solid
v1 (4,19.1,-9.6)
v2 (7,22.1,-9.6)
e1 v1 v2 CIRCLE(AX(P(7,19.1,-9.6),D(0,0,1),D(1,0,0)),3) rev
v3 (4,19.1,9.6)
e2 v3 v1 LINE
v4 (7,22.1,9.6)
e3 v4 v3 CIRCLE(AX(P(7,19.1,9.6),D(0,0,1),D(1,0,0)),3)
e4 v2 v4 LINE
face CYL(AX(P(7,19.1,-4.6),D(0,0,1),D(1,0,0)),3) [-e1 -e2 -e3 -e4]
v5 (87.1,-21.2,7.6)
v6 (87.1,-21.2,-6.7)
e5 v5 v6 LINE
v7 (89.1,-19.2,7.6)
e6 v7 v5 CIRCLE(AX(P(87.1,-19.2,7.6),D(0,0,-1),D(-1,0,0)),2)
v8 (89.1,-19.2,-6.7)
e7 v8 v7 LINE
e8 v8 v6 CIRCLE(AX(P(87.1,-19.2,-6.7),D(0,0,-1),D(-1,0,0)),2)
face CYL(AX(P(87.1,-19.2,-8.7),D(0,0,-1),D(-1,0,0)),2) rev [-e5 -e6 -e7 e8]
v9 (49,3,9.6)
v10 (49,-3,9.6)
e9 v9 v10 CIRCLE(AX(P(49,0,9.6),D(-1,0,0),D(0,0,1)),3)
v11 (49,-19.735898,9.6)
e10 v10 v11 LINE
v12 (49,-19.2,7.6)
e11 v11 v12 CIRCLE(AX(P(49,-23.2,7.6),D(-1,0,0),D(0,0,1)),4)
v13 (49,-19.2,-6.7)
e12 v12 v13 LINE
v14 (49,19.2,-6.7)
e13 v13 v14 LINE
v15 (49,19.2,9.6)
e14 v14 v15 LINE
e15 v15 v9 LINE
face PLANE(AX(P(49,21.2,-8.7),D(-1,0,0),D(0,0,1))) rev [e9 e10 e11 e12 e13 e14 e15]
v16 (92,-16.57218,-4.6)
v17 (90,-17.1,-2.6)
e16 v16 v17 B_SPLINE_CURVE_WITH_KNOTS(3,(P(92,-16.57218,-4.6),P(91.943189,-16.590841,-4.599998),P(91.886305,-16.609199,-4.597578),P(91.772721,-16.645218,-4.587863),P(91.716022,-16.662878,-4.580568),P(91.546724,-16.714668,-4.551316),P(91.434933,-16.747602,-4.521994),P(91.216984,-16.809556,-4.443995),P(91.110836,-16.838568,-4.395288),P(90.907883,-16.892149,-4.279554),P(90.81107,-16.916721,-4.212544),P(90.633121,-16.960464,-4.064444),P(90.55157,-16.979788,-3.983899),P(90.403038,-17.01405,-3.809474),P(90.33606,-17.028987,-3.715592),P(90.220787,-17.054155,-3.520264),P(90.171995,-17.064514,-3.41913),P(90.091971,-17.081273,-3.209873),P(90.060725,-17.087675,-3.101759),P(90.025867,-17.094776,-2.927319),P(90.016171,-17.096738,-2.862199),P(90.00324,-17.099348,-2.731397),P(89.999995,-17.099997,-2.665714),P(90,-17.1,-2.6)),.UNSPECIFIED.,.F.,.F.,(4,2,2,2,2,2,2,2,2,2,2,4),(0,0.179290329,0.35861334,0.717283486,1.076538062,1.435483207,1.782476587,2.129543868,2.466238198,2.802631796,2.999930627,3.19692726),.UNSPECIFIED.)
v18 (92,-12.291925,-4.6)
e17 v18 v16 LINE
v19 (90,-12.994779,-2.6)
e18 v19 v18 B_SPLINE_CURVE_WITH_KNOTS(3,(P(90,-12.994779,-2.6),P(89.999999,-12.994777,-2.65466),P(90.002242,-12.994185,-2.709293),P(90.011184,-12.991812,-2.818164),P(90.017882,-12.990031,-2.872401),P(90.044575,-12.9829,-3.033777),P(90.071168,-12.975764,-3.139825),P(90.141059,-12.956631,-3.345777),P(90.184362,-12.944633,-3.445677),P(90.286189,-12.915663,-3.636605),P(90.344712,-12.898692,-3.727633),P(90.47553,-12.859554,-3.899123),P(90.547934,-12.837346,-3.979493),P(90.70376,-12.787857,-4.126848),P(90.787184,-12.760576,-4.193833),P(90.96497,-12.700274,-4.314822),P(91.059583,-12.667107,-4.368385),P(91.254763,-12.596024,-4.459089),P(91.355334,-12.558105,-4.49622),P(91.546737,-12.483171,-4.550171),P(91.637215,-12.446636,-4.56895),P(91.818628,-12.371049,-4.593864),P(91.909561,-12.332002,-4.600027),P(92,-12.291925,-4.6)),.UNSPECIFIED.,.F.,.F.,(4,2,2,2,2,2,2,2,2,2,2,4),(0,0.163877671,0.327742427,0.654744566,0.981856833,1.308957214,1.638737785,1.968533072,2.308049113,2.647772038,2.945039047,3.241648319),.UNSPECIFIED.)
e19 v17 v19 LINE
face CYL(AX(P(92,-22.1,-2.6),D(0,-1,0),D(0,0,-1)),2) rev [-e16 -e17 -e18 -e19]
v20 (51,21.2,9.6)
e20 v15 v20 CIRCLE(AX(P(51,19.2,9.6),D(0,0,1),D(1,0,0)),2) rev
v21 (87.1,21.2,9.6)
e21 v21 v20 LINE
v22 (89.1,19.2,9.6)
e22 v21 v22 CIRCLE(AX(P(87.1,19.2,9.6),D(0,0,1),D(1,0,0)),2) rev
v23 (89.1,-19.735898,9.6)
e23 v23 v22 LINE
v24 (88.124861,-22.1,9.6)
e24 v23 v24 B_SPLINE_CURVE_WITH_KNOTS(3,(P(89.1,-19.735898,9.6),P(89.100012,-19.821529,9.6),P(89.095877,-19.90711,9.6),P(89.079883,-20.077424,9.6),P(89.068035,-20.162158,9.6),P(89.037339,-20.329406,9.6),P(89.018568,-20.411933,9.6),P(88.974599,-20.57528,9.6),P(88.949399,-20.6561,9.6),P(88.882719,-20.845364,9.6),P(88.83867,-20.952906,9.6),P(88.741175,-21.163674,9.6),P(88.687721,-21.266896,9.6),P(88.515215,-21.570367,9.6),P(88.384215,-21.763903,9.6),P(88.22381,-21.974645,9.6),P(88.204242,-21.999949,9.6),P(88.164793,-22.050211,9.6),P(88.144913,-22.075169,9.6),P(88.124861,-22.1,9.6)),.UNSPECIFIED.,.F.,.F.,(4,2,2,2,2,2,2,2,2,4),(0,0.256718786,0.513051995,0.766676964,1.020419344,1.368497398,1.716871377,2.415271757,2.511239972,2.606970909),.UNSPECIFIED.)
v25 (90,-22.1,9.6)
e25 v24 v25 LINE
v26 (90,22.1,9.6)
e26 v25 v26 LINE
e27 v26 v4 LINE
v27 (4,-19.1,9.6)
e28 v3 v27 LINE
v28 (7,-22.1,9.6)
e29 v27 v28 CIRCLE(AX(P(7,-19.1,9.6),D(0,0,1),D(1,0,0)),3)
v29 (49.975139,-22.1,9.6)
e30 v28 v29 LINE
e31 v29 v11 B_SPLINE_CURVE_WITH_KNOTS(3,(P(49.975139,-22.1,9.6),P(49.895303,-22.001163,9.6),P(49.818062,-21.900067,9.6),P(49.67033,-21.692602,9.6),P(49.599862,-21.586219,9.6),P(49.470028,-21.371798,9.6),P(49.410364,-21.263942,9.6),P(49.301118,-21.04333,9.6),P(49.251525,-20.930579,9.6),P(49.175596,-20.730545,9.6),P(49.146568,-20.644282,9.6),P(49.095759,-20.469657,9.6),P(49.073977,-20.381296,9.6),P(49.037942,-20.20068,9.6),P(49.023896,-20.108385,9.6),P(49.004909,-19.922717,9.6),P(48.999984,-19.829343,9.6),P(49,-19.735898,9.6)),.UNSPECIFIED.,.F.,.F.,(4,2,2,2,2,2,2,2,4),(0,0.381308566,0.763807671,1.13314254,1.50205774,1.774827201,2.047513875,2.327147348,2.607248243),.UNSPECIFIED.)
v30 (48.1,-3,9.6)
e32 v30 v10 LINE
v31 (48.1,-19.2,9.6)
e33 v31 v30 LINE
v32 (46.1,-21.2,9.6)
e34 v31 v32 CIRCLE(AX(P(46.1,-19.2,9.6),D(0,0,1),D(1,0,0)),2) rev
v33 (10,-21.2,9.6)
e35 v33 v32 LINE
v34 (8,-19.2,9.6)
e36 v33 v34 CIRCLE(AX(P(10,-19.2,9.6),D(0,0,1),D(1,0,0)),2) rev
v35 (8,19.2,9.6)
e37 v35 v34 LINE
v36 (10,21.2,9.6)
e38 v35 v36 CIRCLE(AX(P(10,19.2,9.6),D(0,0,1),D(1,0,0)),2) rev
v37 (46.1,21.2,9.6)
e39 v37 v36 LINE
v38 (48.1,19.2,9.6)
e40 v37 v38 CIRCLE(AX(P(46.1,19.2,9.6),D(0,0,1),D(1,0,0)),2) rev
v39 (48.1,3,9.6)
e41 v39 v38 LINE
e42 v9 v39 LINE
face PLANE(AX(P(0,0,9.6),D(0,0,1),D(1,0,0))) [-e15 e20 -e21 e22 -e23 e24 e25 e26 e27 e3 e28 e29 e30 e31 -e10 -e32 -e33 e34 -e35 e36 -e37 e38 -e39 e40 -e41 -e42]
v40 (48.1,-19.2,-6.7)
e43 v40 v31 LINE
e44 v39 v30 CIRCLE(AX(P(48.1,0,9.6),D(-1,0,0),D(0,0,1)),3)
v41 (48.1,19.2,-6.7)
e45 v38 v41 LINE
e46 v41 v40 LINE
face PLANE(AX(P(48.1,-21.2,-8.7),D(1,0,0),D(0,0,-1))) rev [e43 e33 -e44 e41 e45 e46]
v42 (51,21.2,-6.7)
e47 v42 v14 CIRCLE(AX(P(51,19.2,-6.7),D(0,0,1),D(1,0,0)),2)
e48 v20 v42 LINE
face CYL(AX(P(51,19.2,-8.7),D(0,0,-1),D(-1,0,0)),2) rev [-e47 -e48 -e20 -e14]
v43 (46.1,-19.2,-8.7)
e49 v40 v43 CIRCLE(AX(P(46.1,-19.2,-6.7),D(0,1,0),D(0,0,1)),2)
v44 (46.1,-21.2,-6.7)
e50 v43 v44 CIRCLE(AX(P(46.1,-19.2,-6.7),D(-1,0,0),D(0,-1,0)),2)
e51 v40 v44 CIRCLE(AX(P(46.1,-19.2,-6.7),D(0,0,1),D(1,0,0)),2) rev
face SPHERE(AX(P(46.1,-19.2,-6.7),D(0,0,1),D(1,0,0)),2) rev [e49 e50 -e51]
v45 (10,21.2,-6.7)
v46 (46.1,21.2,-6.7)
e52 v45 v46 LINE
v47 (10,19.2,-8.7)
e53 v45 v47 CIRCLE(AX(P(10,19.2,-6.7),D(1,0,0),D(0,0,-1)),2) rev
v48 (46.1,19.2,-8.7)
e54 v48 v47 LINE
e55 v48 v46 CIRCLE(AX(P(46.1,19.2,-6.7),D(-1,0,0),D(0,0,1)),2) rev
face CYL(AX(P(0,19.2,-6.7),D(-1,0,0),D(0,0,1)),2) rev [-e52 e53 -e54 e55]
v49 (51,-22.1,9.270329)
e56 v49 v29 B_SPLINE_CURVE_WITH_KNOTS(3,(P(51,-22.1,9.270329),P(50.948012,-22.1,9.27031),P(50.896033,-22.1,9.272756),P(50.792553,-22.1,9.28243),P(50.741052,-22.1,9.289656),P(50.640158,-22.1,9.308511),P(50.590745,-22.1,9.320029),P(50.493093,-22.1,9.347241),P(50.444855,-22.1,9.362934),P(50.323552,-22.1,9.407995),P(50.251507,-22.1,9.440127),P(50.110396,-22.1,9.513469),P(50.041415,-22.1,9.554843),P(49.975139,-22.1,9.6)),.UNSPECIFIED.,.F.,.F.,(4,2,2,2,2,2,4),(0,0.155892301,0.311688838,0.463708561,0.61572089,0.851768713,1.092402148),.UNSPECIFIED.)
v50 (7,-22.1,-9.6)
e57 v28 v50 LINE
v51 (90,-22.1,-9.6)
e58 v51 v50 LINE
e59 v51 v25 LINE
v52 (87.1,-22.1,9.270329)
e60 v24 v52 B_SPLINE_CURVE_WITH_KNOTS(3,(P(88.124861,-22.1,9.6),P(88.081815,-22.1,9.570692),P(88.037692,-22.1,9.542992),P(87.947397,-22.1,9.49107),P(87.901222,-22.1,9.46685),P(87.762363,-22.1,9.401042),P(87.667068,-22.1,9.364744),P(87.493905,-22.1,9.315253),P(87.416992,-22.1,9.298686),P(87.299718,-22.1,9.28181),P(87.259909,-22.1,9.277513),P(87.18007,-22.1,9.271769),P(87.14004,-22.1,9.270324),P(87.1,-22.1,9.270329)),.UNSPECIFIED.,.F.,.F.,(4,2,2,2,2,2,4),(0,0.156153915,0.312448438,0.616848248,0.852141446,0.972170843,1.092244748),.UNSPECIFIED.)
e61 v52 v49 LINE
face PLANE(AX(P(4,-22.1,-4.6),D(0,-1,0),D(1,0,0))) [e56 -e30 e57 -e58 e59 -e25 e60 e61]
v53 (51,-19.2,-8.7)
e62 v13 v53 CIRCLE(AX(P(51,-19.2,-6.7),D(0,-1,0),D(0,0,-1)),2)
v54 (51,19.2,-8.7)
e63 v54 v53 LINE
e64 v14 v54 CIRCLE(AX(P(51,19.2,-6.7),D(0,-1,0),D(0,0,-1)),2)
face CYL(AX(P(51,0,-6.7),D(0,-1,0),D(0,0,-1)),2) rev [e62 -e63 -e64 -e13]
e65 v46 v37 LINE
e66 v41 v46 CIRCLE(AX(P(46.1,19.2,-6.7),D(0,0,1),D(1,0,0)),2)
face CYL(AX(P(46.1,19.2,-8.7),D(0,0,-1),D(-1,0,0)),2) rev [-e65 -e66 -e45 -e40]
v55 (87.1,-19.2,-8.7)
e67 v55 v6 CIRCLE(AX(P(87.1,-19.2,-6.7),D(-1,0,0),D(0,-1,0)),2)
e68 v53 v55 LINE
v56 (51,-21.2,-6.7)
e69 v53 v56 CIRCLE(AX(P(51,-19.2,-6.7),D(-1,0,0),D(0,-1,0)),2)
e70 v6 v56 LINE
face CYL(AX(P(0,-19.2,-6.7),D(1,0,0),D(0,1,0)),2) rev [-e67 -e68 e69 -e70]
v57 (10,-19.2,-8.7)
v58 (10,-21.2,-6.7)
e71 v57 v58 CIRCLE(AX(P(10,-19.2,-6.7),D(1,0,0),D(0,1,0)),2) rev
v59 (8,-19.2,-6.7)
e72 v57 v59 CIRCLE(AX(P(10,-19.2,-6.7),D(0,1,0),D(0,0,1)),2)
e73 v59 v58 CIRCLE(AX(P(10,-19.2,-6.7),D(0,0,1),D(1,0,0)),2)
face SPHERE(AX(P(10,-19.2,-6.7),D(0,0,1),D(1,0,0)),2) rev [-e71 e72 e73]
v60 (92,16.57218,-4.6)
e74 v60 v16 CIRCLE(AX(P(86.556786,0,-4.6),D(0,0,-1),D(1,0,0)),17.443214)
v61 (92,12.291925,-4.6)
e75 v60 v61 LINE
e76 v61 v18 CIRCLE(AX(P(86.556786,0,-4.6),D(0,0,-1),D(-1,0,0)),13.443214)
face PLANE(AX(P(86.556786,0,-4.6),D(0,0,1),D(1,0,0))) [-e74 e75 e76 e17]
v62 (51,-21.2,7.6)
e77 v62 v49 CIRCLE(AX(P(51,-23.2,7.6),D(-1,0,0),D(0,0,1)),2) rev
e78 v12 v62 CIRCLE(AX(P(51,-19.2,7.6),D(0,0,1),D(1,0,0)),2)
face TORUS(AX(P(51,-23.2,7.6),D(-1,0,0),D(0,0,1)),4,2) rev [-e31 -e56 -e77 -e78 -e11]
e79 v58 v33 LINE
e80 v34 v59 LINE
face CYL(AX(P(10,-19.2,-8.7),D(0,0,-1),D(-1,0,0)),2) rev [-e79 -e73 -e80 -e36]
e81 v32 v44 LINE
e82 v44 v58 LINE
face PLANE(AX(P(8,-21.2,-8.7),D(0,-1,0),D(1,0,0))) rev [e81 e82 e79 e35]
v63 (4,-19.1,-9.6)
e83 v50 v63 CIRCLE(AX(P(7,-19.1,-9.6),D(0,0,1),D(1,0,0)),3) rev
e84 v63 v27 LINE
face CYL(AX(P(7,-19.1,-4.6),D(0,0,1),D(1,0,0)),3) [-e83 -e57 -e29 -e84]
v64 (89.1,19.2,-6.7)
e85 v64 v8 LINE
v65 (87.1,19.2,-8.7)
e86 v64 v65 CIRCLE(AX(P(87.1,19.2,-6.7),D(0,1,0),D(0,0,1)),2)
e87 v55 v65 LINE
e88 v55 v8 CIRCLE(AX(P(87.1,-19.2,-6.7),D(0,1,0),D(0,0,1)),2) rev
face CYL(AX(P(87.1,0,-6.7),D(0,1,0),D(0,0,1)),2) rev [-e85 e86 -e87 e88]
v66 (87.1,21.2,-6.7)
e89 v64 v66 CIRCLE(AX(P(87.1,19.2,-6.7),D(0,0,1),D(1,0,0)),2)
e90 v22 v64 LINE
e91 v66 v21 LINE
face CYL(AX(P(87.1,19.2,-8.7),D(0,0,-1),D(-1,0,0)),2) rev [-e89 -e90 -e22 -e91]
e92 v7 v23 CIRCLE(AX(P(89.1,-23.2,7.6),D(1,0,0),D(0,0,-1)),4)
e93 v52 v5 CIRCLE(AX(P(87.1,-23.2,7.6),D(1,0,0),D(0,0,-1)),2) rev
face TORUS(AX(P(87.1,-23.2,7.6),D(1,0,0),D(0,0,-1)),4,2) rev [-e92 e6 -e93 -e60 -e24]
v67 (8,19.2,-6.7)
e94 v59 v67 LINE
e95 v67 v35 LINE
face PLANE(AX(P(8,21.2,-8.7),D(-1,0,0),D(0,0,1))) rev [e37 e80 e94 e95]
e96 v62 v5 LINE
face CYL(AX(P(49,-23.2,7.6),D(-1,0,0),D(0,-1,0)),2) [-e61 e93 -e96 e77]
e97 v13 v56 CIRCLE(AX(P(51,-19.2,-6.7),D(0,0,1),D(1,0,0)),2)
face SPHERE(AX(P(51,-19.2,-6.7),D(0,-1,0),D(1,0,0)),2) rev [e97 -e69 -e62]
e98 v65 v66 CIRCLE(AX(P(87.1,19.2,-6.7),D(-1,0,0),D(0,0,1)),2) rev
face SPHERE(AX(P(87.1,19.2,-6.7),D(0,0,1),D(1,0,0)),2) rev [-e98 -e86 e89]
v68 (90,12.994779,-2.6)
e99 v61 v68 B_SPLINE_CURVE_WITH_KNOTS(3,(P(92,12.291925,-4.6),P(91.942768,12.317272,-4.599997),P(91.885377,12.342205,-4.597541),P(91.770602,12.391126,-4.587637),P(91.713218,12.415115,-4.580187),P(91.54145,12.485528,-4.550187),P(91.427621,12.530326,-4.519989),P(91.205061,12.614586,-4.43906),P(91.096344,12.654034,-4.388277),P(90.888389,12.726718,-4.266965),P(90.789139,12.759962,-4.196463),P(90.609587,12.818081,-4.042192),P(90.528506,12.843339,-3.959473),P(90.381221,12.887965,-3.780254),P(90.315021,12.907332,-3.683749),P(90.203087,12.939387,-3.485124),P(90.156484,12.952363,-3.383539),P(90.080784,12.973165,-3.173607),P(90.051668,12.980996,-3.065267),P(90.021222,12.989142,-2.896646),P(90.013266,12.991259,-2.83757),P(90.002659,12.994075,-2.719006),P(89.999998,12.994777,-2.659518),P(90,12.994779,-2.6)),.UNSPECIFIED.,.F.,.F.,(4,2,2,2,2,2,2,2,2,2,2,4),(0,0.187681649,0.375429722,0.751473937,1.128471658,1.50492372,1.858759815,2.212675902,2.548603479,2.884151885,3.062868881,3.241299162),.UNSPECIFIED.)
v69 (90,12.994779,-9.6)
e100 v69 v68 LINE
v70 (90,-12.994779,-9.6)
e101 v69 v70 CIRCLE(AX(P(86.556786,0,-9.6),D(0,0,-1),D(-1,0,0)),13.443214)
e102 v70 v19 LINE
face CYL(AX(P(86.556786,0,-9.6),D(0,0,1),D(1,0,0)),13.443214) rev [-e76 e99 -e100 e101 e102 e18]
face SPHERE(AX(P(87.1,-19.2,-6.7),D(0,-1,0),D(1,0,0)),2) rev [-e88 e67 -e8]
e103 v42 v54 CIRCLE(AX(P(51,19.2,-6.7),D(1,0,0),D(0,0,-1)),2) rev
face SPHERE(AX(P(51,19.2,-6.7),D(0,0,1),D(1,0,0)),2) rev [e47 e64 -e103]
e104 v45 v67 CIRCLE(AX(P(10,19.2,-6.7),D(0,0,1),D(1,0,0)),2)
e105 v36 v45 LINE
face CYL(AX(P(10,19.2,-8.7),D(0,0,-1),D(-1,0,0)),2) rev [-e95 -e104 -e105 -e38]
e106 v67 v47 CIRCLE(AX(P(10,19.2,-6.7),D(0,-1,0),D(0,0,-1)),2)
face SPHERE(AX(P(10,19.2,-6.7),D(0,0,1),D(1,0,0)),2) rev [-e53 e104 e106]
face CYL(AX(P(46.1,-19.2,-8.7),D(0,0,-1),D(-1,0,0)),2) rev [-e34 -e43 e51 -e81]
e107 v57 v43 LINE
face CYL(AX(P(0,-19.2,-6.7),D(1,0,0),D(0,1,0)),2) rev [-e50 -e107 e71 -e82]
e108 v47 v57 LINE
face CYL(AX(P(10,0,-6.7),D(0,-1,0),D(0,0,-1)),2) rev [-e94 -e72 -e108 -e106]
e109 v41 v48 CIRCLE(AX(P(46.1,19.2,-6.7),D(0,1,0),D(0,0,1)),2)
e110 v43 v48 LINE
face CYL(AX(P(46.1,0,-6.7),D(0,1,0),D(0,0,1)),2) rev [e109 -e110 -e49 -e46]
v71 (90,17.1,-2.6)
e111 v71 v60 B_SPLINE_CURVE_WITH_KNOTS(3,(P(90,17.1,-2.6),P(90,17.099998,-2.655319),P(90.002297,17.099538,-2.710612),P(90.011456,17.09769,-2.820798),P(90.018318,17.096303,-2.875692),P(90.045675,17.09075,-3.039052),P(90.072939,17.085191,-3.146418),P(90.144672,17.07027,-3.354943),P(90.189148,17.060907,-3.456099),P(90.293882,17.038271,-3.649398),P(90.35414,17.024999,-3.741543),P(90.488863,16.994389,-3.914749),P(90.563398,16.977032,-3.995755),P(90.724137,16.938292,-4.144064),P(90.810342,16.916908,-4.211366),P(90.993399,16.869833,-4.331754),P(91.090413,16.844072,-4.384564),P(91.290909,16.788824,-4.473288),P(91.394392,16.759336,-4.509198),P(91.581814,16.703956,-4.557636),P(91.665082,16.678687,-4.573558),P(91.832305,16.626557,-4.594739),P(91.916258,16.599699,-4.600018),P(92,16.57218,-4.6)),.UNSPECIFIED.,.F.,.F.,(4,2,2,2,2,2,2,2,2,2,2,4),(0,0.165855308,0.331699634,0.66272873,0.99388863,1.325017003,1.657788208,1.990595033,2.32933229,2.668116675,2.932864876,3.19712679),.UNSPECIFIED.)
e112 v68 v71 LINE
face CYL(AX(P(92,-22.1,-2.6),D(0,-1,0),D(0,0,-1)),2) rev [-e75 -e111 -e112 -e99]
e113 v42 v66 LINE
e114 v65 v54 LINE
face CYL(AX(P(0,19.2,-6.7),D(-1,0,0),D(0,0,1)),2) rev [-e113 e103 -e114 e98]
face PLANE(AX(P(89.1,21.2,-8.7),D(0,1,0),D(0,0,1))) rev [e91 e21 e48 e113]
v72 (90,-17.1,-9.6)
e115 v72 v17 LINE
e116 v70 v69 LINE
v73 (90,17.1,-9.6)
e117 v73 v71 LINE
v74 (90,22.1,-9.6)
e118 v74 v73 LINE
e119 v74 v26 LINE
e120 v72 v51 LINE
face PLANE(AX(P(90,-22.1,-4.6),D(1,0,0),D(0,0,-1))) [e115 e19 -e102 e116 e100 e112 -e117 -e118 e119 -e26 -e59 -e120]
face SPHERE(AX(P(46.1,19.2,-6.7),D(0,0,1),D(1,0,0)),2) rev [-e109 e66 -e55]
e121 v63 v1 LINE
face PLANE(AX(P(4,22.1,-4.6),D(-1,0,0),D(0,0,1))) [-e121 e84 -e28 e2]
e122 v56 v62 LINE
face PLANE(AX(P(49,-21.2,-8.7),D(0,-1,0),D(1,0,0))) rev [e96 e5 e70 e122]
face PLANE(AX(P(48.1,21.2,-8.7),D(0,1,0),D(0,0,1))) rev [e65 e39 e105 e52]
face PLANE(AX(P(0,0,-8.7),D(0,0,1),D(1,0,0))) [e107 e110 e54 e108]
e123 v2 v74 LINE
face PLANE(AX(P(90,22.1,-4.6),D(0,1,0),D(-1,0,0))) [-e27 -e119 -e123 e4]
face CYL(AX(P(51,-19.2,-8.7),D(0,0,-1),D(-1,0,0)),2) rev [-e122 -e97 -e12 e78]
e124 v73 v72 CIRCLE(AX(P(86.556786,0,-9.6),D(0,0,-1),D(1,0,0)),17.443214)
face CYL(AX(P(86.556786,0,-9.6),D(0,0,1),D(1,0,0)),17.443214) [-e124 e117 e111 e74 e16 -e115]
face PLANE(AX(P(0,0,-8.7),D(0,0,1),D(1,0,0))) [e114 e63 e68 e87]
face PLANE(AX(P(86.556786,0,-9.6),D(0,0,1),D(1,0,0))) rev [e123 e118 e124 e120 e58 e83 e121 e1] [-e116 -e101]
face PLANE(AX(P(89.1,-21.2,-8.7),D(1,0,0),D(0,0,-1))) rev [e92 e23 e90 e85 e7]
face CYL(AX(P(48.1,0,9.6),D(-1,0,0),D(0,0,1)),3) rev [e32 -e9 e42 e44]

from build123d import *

# Parameters (mm, degrees)
SKETCH_1_W                  = 86
SKETCH_1_H                  = 44.2
EXTRUDE_1_DEPTH             = 14.2
EXTRUDE_2_DEPTH             = 5
SKETCH_3_W                  = 40.1
SKETCH_3_H                  = 42.4
CUT_EXTRUDE_1_DEPTH         = 18.3
SKETCH_4_W                  = 40.1
SKETCH_4_H                  = 42.4
CUT_EXTRUDE_2_DEPTH         = 18.3
HOLE_WIZARD_8_3_8_3_1_D     = 8.3
HOLE_WIZARD_8_3_8_3_1_DEPTH = 3.2
HOLE_WIZARD_6_0_6_1_D       = 6
HOLE_WIZARD_6_0_6_1_DEPTH   = 0.9
FILLET_1_R                  = 3
EXTRUDE_START               = -3.5
SKETCH_9_R                  = 4.15
EXTRUDE_3_DEPTH             = 3.5
FILLET_2_R                  = 2
FILLET_3_R                  = 2
FILLET_4_R                  = 2
FILLET_5_R                  = 2


with BuildPart() as part:
    # Эскиз1 → Бобышка-Вытянуть1 (new body)
    with BuildSketch(Plane.XY.offset(9.6)):
        with Locations((47, 0)):
            Rectangle(SKETCH_1_W, SKETCH_1_H)
    extrude(amount=-EXTRUDE_1_DEPTH)

    # Эскиз2 → Бобышка-Вытянуть2 (add)
    with BuildSketch(Plane(origin=(0, 0, -4.6), x_dir=(-1, 0, 0), z_dir=(0, 0, -1))):
        with BuildLine():
            Line((-90, -22.1), (-90, -17.1))
            ThreePointArc((-90, -17.1), (-104, 0), (-90, 17.1))
            Line((-90, 17.1), (-90, 22.1))
            Line((-90, 22.1), (-4, 22.1))
            Line((-4, 22.1), (-4, -22.1))
            Line((-4, -22.1), (-90, -22.1))
        make_face()
        with BuildLine():
            Line((-90, -12.994779171), (-90, 12.994779171))
            ThreePointArc((-90, 12.994779171), (-100, 0), (-90, -12.994779171))
        make_face(mode=Mode.SUBTRACT)
    extrude(amount=EXTRUDE_2_DEPTH)

    # Эскиз3 → Вырез-Вытянуть1 (cut)
    with BuildSketch(Plane.XY.offset(9.6)):
        with Locations((28.05, 0)):
            Rectangle(SKETCH_3_W, SKETCH_3_H)
    extrude(amount=-CUT_EXTRUDE_1_DEPTH, mode=Mode.SUBTRACT)

    # Эскиз4 → Вырез-Вытянуть2 (cut)
    with BuildSketch(Plane.XY.offset(9.6)):
        with Locations((69.05, 0)):
            Rectangle(SKETCH_4_W, SKETCH_4_H)
    extrude(amount=-CUT_EXTRUDE_2_DEPTH, mode=Mode.SUBTRACT)

    # Диаметр отверстия Ø8.3 (8.3)1
    with Locations(Plane.ZY.offset(-4)):
        with Locations((0, 0)):
            Hole(HOLE_WIZARD_8_3_8_3_1_D / 2, depth=HOLE_WIZARD_8_3_8_3_1_DEPTH)

    # Диаметр отверстия Ø6.0 (6)1
    with Locations(Plane.ZY.offset(-48.1)):
        with Locations((9.6, 0)):
            Hole(HOLE_WIZARD_6_0_6_1_D / 2, depth=HOLE_WIZARD_6_0_6_1_DEPTH)

    # Скругление1
    fillet_1_edges = [part.edges().sort_by_distance(p)[0] for p in [
        (4, -22.1, 0),
        (4, 22.1, 0),
    ]]
    fillet(fillet_1_edges, radius=FILLET_1_R)

    # Эскиз9 → Бобышка-Вытянуть3 (add)
    with BuildSketch(Plane.ZY.offset(-4).offset(EXTRUDE_START)):
        Circle(SKETCH_9_R)
    extrude(amount=EXTRUDE_3_DEPTH)

    # Скругление2
    # the kernel refuses this fillet: 2 mm, written as the material it adds along each edge
    with BuildSketch(Plane(origin=(51, 19.2, -6.7), x_dir=(0, 1, 0), z_dir=(-1, 0, 0))) as fillet_2_piece_1_section:
        Polygon((0, 0), (FILLET_2_R * 1.02, 0), (FILLET_2_R * 1.02, FILLET_2_R * 1.02), (0, FILLET_2_R * 1.02), align=None)
    fillet_2_piece_1 = extrude(amount=FILLET_2_R * 1.02, mode=Mode.PRIVATE)
    fillet_2_piece_1 = fillet_2_piece_1 - Plane(origin=(51, 19.2, -6.7), x_dir=(0, -0.7071067811865475, 0.7071067811865475), z_dir=(-1, 0, 0)) * Sphere(FILLET_2_R, mode=Mode.PRIVATE)
    add(fillet_2_piece_1)
    with BuildSketch(Plane(origin=(46.1, -19.2, -6.7), x_dir=(0, 0, -1), z_dir=(0, -1, 0))) as fillet_2_piece_2_section:
        Polygon((0, 0), (FILLET_2_R * 1.02, 0), (FILLET_2_R * 1.02, FILLET_2_R * 1.02), (0, FILLET_2_R * 1.02), align=None)
    fillet_2_piece_2 = extrude(amount=FILLET_2_R * 1.02, mode=Mode.PRIVATE)
    fillet_2_piece_2 = fillet_2_piece_2 - Plane(origin=(46.1, -19.2, -6.7), x_dir=(-0.7071067811865475, 0, 0.7071067811865475), z_dir=(0, -1, 0)) * Sphere(FILLET_2_R, mode=Mode.PRIVATE)
    add(fillet_2_piece_2)
    with BuildSketch(Plane(origin=(10, -19.2, -6.7), x_dir=(-1, 0, 0), z_dir=(0, 0, -1))) as fillet_2_piece_3_section:
        Polygon((0, 0), (FILLET_2_R * 1.02, 0), (FILLET_2_R * 1.02, -FILLET_2_R * 1.02), (0, -FILLET_2_R * 1.02), align=None)
    fillet_2_piece_3 = extrude(amount=FILLET_2_R * 1.02, mode=Mode.PRIVATE)
    fillet_2_piece_3 = fillet_2_piece_3 - Plane(origin=(10, -19.2, -6.7), x_dir=(0.707106781186543, 0.7071067811865519, 0), z_dir=(0, 0, -1)) * Sphere(FILLET_2_R, mode=Mode.PRIVATE)
    add(fillet_2_piece_3)
    with BuildSketch(Plane(origin=(10, 19.2, -6.7), x_dir=(0, 1, 0), z_dir=(0, 0, -1))) as fillet_2_piece_4_section:
        Polygon((0, 0), (FILLET_2_R * 1.02, 0), (FILLET_2_R * 1.02, -FILLET_2_R * 1.02), (0, -FILLET_2_R * 1.02), align=None)
    fillet_2_piece_4 = extrude(amount=FILLET_2_R * 1.02, mode=Mode.PRIVATE)
    fillet_2_piece_4 = fillet_2_piece_4 - Plane(origin=(10, 19.2, -6.7), x_dir=(0.7071067811865475, -0.7071067811865475, 0), z_dir=(0, 0, -1)) * Sphere(FILLET_2_R, mode=Mode.PRIVATE)
    add(fillet_2_piece_4)
    with BuildSketch(Plane(origin=(89.1, -21.2, -8.7), x_dir=(0, 0, 1), z_dir=(0, 1, 0))) as fillet_2_piece_5:
        with BuildLine():
            CenterArc((FILLET_2_R, -FILLET_2_R), FILLET_2_R, 90, 90)
            Line((0, -FILLET_2_R), (0, 0))
            Line((0, 0), (FILLET_2_R, 0))
        make_face()
    extrude(amount=42.4)
    with BuildSketch(Plane(origin=(89.1, 21.2, -8.7), x_dir=(0, 0, 1), z_dir=(-1, 0, 0))) as fillet_2_piece_6:
        with BuildLine():
            CenterArc((FILLET_2_R, -FILLET_2_R), FILLET_2_R, 90, 90)
            Line((0, -FILLET_2_R), (0, 0))
            Line((0, 0), (FILLET_2_R, 0))
        make_face()
    extrude(amount=38.1)
    with BuildSketch(Plane(origin=(49, 21.2, 9.6), x_dir=(0, -1, 0), z_dir=(0, 0, -1)), Plane(origin=(48.1, -21.2, 9.6), x_dir=(0, 1, 0), z_dir=(0, 0, -1))) as fillet_2_piece_7:
        with BuildLine():
            CenterArc((FILLET_2_R, -FILLET_2_R), FILLET_2_R, 90, 90)
            Line((0, -FILLET_2_R), (0, 0))
            Line((0, 0), (FILLET_2_R, 0))
        make_face()
    extrude(amount=16.3)
    with BuildSketch(Plane(origin=(8, -21.2, 9.6), x_dir=(0, 1, 0), z_dir=(0, 0, -1)), Plane(origin=(8, 21.2, 9.6), x_dir=(1, 0, 0), z_dir=(0, 0, -1))) as fillet_2_piece_8:
        with BuildLine():
            CenterArc((FILLET_2_R, FILLET_2_R), FILLET_2_R, 180, 90)
            Line((0, FILLET_2_R), (0, 0))
            Line((0, 0), (FILLET_2_R, 0))
        make_face()
    extrude(amount=16.3)
    with BuildSketch(Plane(origin=(49, 19.2, -8.7), x_dir=(0, 0, 1), z_dir=(0, -1, 0)), Plane(origin=(48.1, -19.2, -8.7), x_dir=(0, 0, 1), z_dir=(0, 1, 0))) as fillet_2_piece_9:
        with BuildLine():
            CenterArc((FILLET_2_R, -FILLET_2_R), FILLET_2_R, 90, 90)
            Line((0, -FILLET_2_R), (0, 0))
            Line((0, 0), (FILLET_2_R, 0))
        make_face()
    extrude(amount=40.4)
    with BuildSketch(Plane(origin=(53.1, 21.2, -8.7), x_dir=(0, 0, 1), z_dir=(-1, 0, 0))) as fillet_2_piece_10:
        with BuildLine():
            CenterArc((FILLET_2_R, -FILLET_2_R), FILLET_2_R, 90, 90)
            Line((0, -FILLET_2_R), (0, 0))
            Line((0, 0), (FILLET_2_R, 0))
        make_face()
    extrude(amount=43.1)
    with BuildSketch(Plane(origin=(10, -21.2, -8.7), x_dir=(0, 0, 1), z_dir=(1, 0, 0))) as fillet_2_piece_11:
        with BuildLine():
            CenterArc((FILLET_2_R, -FILLET_2_R), FILLET_2_R, 90, 90)
            Line((0, -FILLET_2_R), (0, 0))
            Line((0, 0), (FILLET_2_R, 0))
        make_face()
    extrude(amount=36.1)
    with BuildSketch(Plane(origin=(8, 19.2, -8.7), x_dir=(0, 0, 1), z_dir=(0, -1, 0))) as fillet_2_piece_12:
        with BuildLine():
            CenterArc((FILLET_2_R, -FILLET_2_R), FILLET_2_R, 90, 90)
            Line((0, -FILLET_2_R), (0, 0))
            Line((0, 0), (FILLET_2_R, 0))
        make_face()
    extrude(amount=38.4)
    # the kernel refuses this fillet: 2 mm, written as the material it takes off along each edge
    with BuildSketch(Plane(origin=(49, -21.2, 9.6), x_dir=(0, -1, 0), z_dir=(1, 0, 0))) as fillet_2_2_piece_1:
        with BuildLine():
            CenterArc((FILLET_2_R, FILLET_2_R), FILLET_2_R, 180, 90)
            Line((0, FILLET_2_R), (0, 0))
            Line((0, 0), (FILLET_2_R, 0))
        make_face()
    extrude(amount=40.1, mode=Mode.SUBTRACT)

    # Скругление3
    # the kernel refuses this fillet: 2 mm, written as the material it adds along each edge
    with BuildSketch(Plane(origin=(46.1, 19.2, -6.7), x_dir=(0, 1, 0), z_dir=(1, 0, 0))) as fillet_3_piece_1_section:
        Polygon((0, 0), (FILLET_3_R, 0), (FILLET_3_R, -FILLET_3_R), (0, -FILLET_3_R), align=None)
    fillet_3_piece_1 = extrude(amount=FILLET_3_R, mode=Mode.PRIVATE)
    fillet_3_piece_1 = fillet_3_piece_1 - Plane(origin=(46.1, 19.2, -6.7), x_dir=(0, -0.7071067811865475, 0.7071067811865475), z_dir=(1, 0, 0)) * Sphere(FILLET_3_R, mode=Mode.PRIVATE)
    add(fillet_3_piece_1)
    with BuildSketch(Plane(origin=(89.1, -23.2, 7.6), x_dir=(0, 1, 0), z_dir=(0, 0, -1))) as fillet_3_piece_2_section:
        with BuildLine():
            CenterArc((2 + FILLET_3_R, -FILLET_3_R), FILLET_3_R, 90, 90)
            Line((2, -FILLET_3_R), (2, 0))
            Line((2, 0), (2 + FILLET_3_R, 0))
        make_face()
    fillet_3_piece_2 = revolve(axis=Axis((89.1, -23.2, 7.6), (1, 0, 0)), revolution_arc=199.895215799, mode=Mode.PRIVATE)
    fillet_3_piece_2 = split(fillet_3_piece_2, bisect_by=Plane(origin=(88.655987969, -22.1, 8.63173809), z_dir=(0, 1, 0)), keep=Keep.TOP, mode=Mode.PRIVATE)
    fillet_3_piece_2 = split(fillet_3_piece_2, bisect_by=Plane(origin=(88.655987969, -21.07116748, 9.6), z_dir=(0, 0, -1)), keep=Keep.TOP, mode=Mode.PRIVATE)
    add(fillet_3_piece_2)
    with BuildSketch(Plane(origin=(89.1, -21.2, 7.6), x_dir=(0, 1, 0), z_dir=(0, 0, -1))) as fillet_3_piece_3:
        with BuildLine():
            CenterArc((FILLET_3_R, -FILLET_3_R), FILLET_3_R, 90, 90)
            Line((0, -FILLET_3_R), (0, 0))
            Line((0, 0), (FILLET_3_R, 0))
        make_face()
    extrude(amount=14.3)
    with BuildSketch(Plane(origin=(87.1, -21.2, -6.7), x_dir=(1, 0, 0), z_dir=(0, 0, 1))) as fillet_3_piece_4:
        with BuildLine():
            CenterArc((2 - FILLET_3_R, FILLET_3_R), FILLET_3_R, 270, 90)
            Line((2 - FILLET_3_R, 0), (2, 0))
            Line((2, 0), (2, FILLET_3_R))
        make_face()
    revolve(axis=Axis((87.1, -21.2, -6.7), (0, 1, 0)), revolution_arc=90)
    with BuildSketch(Plane(origin=(51, -21.2, -8.7), x_dir=(0, 1, 0), z_dir=(1, 0, 0))) as fillet_3_piece_5:
        with BuildLine():
            CenterArc((FILLET_3_R, FILLET_3_R), FILLET_3_R, 180, 90)
            Line((0, FILLET_3_R), (0, 0))
            Line((0, 0), (FILLET_3_R, 0))
        make_face()
    extrude(amount=36.1)
    with BuildSketch(Plane(origin=(51, -21.2, -6.7), x_dir=(-1, 0, 0), z_dir=(0, 0, 1))) as fillet_3_piece_6:
        with BuildLine():
            CenterArc((2 - FILLET_3_R, -FILLET_3_R), FILLET_3_R, 360, 90)
            Line((2, -FILLET_3_R), (2, 0))
            Line((2, 0), (2 - FILLET_3_R, 0))
        make_face()
    revolve(axis=Axis((51, -21.2, -6.7), (0, -1, 0)), revolution_arc=90)
    with BuildSketch(Plane(origin=(49, -23.2, 7.6), x_dir=(0, 1, 0), z_dir=(0, 0, -1))) as fillet_3_piece_7_section:
        with BuildLine():
            CenterArc((2 + FILLET_3_R, FILLET_3_R), FILLET_3_R, 180, 90)
            Line((2, FILLET_3_R), (2, 0))
            Line((2, 0), (2 + FILLET_3_R, 0))
        make_face()
    fillet_3_piece_7 = revolve(axis=Axis((49, -23.2, 7.6), (1, 0, 0)), revolution_arc=199.895215799, mode=Mode.PRIVATE)
    fillet_3_piece_7 = split(fillet_3_piece_7, bisect_by=Plane(origin=(49.444012031, -22.1, 8.63173809), z_dir=(0, 1, 0)), keep=Keep.TOP, mode=Mode.PRIVATE)
    fillet_3_piece_7 = split(fillet_3_piece_7, bisect_by=Plane(origin=(49.444012031, -21.07116748, 9.6), z_dir=(0, 0, -1)), keep=Keep.TOP, mode=Mode.PRIVATE)
    add(fillet_3_piece_7)
    with BuildSketch(Plane(origin=(49, -21.2, 7.6), x_dir=(0, 1, 0), z_dir=(0, 0, -1))) as fillet_3_piece_8:
        with BuildLine():
            CenterArc((FILLET_3_R, FILLET_3_R), FILLET_3_R, 180, 90)
            Line((0, FILLET_3_R), (0, 0))
            Line((0, 0), (FILLET_3_R, 0))
        make_face()
    extrude(amount=14.3)
    with BuildSketch(Plane(origin=(48.1, 21.2, 9.6), x_dir=(0, -1, 0), z_dir=(0, 0, -1))) as fillet_3_piece_9:
        with BuildLine():
            CenterArc((FILLET_3_R, FILLET_3_R), FILLET_3_R, 180, 90)
            Line((0, FILLET_3_R), (0, 0))
            Line((0, 0), (FILLET_3_R, 0))
        make_face()
    extrude(amount=16.3)

    # Скругление4
    # the kernel refuses this fillet: 2 mm, written as the material it adds along each edge
    with BuildSketch(Plane(origin=(87.1, 19.2, -6.7), x_dir=(0, 1, 0), z_dir=(1, 0, 0))) as fillet_4_piece_1_section:
        Polygon((0, 0), (FILLET_4_R, 0), (FILLET_4_R, -FILLET_4_R), (0, -FILLET_4_R), align=None)
    fillet_4_piece_1 = extrude(amount=FILLET_4_R, mode=Mode.PRIVATE)
    fillet_4_piece_1 = fillet_4_piece_1 - Plane(origin=(87.1, 19.2, -6.7), x_dir=(0, -0.7071067811865475, 0.7071067811865475), z_dir=(1, 0, 0)) * Sphere(FILLET_4_R, mode=Mode.PRIVATE)
    add(fillet_4_piece_1)
    with BuildSketch(Plane(origin=(89.1, 21.2, 9.6), x_dir=(0, -1, 0), z_dir=(0, 0, -1))) as fillet_4_piece_2:
        with BuildLine():
            CenterArc((FILLET_4_R, FILLET_4_R), FILLET_4_R, 180, 90)
            Line((0, FILLET_4_R), (0, 0))
            Line((0, 0), (FILLET_4_R, 0))
        make_face()
    extrude(amount=16.3)

    # Скругление5
    fillet_5_edges = [part.edges().sort_by_distance(p)[0] for p in [
        (90, -15.047389586, -4.6),
        (90, 15.047389586, -4.6),
    ]]
    fillet(fillet_5_edges, radius=FILLET_5_R)


solid = part.part
